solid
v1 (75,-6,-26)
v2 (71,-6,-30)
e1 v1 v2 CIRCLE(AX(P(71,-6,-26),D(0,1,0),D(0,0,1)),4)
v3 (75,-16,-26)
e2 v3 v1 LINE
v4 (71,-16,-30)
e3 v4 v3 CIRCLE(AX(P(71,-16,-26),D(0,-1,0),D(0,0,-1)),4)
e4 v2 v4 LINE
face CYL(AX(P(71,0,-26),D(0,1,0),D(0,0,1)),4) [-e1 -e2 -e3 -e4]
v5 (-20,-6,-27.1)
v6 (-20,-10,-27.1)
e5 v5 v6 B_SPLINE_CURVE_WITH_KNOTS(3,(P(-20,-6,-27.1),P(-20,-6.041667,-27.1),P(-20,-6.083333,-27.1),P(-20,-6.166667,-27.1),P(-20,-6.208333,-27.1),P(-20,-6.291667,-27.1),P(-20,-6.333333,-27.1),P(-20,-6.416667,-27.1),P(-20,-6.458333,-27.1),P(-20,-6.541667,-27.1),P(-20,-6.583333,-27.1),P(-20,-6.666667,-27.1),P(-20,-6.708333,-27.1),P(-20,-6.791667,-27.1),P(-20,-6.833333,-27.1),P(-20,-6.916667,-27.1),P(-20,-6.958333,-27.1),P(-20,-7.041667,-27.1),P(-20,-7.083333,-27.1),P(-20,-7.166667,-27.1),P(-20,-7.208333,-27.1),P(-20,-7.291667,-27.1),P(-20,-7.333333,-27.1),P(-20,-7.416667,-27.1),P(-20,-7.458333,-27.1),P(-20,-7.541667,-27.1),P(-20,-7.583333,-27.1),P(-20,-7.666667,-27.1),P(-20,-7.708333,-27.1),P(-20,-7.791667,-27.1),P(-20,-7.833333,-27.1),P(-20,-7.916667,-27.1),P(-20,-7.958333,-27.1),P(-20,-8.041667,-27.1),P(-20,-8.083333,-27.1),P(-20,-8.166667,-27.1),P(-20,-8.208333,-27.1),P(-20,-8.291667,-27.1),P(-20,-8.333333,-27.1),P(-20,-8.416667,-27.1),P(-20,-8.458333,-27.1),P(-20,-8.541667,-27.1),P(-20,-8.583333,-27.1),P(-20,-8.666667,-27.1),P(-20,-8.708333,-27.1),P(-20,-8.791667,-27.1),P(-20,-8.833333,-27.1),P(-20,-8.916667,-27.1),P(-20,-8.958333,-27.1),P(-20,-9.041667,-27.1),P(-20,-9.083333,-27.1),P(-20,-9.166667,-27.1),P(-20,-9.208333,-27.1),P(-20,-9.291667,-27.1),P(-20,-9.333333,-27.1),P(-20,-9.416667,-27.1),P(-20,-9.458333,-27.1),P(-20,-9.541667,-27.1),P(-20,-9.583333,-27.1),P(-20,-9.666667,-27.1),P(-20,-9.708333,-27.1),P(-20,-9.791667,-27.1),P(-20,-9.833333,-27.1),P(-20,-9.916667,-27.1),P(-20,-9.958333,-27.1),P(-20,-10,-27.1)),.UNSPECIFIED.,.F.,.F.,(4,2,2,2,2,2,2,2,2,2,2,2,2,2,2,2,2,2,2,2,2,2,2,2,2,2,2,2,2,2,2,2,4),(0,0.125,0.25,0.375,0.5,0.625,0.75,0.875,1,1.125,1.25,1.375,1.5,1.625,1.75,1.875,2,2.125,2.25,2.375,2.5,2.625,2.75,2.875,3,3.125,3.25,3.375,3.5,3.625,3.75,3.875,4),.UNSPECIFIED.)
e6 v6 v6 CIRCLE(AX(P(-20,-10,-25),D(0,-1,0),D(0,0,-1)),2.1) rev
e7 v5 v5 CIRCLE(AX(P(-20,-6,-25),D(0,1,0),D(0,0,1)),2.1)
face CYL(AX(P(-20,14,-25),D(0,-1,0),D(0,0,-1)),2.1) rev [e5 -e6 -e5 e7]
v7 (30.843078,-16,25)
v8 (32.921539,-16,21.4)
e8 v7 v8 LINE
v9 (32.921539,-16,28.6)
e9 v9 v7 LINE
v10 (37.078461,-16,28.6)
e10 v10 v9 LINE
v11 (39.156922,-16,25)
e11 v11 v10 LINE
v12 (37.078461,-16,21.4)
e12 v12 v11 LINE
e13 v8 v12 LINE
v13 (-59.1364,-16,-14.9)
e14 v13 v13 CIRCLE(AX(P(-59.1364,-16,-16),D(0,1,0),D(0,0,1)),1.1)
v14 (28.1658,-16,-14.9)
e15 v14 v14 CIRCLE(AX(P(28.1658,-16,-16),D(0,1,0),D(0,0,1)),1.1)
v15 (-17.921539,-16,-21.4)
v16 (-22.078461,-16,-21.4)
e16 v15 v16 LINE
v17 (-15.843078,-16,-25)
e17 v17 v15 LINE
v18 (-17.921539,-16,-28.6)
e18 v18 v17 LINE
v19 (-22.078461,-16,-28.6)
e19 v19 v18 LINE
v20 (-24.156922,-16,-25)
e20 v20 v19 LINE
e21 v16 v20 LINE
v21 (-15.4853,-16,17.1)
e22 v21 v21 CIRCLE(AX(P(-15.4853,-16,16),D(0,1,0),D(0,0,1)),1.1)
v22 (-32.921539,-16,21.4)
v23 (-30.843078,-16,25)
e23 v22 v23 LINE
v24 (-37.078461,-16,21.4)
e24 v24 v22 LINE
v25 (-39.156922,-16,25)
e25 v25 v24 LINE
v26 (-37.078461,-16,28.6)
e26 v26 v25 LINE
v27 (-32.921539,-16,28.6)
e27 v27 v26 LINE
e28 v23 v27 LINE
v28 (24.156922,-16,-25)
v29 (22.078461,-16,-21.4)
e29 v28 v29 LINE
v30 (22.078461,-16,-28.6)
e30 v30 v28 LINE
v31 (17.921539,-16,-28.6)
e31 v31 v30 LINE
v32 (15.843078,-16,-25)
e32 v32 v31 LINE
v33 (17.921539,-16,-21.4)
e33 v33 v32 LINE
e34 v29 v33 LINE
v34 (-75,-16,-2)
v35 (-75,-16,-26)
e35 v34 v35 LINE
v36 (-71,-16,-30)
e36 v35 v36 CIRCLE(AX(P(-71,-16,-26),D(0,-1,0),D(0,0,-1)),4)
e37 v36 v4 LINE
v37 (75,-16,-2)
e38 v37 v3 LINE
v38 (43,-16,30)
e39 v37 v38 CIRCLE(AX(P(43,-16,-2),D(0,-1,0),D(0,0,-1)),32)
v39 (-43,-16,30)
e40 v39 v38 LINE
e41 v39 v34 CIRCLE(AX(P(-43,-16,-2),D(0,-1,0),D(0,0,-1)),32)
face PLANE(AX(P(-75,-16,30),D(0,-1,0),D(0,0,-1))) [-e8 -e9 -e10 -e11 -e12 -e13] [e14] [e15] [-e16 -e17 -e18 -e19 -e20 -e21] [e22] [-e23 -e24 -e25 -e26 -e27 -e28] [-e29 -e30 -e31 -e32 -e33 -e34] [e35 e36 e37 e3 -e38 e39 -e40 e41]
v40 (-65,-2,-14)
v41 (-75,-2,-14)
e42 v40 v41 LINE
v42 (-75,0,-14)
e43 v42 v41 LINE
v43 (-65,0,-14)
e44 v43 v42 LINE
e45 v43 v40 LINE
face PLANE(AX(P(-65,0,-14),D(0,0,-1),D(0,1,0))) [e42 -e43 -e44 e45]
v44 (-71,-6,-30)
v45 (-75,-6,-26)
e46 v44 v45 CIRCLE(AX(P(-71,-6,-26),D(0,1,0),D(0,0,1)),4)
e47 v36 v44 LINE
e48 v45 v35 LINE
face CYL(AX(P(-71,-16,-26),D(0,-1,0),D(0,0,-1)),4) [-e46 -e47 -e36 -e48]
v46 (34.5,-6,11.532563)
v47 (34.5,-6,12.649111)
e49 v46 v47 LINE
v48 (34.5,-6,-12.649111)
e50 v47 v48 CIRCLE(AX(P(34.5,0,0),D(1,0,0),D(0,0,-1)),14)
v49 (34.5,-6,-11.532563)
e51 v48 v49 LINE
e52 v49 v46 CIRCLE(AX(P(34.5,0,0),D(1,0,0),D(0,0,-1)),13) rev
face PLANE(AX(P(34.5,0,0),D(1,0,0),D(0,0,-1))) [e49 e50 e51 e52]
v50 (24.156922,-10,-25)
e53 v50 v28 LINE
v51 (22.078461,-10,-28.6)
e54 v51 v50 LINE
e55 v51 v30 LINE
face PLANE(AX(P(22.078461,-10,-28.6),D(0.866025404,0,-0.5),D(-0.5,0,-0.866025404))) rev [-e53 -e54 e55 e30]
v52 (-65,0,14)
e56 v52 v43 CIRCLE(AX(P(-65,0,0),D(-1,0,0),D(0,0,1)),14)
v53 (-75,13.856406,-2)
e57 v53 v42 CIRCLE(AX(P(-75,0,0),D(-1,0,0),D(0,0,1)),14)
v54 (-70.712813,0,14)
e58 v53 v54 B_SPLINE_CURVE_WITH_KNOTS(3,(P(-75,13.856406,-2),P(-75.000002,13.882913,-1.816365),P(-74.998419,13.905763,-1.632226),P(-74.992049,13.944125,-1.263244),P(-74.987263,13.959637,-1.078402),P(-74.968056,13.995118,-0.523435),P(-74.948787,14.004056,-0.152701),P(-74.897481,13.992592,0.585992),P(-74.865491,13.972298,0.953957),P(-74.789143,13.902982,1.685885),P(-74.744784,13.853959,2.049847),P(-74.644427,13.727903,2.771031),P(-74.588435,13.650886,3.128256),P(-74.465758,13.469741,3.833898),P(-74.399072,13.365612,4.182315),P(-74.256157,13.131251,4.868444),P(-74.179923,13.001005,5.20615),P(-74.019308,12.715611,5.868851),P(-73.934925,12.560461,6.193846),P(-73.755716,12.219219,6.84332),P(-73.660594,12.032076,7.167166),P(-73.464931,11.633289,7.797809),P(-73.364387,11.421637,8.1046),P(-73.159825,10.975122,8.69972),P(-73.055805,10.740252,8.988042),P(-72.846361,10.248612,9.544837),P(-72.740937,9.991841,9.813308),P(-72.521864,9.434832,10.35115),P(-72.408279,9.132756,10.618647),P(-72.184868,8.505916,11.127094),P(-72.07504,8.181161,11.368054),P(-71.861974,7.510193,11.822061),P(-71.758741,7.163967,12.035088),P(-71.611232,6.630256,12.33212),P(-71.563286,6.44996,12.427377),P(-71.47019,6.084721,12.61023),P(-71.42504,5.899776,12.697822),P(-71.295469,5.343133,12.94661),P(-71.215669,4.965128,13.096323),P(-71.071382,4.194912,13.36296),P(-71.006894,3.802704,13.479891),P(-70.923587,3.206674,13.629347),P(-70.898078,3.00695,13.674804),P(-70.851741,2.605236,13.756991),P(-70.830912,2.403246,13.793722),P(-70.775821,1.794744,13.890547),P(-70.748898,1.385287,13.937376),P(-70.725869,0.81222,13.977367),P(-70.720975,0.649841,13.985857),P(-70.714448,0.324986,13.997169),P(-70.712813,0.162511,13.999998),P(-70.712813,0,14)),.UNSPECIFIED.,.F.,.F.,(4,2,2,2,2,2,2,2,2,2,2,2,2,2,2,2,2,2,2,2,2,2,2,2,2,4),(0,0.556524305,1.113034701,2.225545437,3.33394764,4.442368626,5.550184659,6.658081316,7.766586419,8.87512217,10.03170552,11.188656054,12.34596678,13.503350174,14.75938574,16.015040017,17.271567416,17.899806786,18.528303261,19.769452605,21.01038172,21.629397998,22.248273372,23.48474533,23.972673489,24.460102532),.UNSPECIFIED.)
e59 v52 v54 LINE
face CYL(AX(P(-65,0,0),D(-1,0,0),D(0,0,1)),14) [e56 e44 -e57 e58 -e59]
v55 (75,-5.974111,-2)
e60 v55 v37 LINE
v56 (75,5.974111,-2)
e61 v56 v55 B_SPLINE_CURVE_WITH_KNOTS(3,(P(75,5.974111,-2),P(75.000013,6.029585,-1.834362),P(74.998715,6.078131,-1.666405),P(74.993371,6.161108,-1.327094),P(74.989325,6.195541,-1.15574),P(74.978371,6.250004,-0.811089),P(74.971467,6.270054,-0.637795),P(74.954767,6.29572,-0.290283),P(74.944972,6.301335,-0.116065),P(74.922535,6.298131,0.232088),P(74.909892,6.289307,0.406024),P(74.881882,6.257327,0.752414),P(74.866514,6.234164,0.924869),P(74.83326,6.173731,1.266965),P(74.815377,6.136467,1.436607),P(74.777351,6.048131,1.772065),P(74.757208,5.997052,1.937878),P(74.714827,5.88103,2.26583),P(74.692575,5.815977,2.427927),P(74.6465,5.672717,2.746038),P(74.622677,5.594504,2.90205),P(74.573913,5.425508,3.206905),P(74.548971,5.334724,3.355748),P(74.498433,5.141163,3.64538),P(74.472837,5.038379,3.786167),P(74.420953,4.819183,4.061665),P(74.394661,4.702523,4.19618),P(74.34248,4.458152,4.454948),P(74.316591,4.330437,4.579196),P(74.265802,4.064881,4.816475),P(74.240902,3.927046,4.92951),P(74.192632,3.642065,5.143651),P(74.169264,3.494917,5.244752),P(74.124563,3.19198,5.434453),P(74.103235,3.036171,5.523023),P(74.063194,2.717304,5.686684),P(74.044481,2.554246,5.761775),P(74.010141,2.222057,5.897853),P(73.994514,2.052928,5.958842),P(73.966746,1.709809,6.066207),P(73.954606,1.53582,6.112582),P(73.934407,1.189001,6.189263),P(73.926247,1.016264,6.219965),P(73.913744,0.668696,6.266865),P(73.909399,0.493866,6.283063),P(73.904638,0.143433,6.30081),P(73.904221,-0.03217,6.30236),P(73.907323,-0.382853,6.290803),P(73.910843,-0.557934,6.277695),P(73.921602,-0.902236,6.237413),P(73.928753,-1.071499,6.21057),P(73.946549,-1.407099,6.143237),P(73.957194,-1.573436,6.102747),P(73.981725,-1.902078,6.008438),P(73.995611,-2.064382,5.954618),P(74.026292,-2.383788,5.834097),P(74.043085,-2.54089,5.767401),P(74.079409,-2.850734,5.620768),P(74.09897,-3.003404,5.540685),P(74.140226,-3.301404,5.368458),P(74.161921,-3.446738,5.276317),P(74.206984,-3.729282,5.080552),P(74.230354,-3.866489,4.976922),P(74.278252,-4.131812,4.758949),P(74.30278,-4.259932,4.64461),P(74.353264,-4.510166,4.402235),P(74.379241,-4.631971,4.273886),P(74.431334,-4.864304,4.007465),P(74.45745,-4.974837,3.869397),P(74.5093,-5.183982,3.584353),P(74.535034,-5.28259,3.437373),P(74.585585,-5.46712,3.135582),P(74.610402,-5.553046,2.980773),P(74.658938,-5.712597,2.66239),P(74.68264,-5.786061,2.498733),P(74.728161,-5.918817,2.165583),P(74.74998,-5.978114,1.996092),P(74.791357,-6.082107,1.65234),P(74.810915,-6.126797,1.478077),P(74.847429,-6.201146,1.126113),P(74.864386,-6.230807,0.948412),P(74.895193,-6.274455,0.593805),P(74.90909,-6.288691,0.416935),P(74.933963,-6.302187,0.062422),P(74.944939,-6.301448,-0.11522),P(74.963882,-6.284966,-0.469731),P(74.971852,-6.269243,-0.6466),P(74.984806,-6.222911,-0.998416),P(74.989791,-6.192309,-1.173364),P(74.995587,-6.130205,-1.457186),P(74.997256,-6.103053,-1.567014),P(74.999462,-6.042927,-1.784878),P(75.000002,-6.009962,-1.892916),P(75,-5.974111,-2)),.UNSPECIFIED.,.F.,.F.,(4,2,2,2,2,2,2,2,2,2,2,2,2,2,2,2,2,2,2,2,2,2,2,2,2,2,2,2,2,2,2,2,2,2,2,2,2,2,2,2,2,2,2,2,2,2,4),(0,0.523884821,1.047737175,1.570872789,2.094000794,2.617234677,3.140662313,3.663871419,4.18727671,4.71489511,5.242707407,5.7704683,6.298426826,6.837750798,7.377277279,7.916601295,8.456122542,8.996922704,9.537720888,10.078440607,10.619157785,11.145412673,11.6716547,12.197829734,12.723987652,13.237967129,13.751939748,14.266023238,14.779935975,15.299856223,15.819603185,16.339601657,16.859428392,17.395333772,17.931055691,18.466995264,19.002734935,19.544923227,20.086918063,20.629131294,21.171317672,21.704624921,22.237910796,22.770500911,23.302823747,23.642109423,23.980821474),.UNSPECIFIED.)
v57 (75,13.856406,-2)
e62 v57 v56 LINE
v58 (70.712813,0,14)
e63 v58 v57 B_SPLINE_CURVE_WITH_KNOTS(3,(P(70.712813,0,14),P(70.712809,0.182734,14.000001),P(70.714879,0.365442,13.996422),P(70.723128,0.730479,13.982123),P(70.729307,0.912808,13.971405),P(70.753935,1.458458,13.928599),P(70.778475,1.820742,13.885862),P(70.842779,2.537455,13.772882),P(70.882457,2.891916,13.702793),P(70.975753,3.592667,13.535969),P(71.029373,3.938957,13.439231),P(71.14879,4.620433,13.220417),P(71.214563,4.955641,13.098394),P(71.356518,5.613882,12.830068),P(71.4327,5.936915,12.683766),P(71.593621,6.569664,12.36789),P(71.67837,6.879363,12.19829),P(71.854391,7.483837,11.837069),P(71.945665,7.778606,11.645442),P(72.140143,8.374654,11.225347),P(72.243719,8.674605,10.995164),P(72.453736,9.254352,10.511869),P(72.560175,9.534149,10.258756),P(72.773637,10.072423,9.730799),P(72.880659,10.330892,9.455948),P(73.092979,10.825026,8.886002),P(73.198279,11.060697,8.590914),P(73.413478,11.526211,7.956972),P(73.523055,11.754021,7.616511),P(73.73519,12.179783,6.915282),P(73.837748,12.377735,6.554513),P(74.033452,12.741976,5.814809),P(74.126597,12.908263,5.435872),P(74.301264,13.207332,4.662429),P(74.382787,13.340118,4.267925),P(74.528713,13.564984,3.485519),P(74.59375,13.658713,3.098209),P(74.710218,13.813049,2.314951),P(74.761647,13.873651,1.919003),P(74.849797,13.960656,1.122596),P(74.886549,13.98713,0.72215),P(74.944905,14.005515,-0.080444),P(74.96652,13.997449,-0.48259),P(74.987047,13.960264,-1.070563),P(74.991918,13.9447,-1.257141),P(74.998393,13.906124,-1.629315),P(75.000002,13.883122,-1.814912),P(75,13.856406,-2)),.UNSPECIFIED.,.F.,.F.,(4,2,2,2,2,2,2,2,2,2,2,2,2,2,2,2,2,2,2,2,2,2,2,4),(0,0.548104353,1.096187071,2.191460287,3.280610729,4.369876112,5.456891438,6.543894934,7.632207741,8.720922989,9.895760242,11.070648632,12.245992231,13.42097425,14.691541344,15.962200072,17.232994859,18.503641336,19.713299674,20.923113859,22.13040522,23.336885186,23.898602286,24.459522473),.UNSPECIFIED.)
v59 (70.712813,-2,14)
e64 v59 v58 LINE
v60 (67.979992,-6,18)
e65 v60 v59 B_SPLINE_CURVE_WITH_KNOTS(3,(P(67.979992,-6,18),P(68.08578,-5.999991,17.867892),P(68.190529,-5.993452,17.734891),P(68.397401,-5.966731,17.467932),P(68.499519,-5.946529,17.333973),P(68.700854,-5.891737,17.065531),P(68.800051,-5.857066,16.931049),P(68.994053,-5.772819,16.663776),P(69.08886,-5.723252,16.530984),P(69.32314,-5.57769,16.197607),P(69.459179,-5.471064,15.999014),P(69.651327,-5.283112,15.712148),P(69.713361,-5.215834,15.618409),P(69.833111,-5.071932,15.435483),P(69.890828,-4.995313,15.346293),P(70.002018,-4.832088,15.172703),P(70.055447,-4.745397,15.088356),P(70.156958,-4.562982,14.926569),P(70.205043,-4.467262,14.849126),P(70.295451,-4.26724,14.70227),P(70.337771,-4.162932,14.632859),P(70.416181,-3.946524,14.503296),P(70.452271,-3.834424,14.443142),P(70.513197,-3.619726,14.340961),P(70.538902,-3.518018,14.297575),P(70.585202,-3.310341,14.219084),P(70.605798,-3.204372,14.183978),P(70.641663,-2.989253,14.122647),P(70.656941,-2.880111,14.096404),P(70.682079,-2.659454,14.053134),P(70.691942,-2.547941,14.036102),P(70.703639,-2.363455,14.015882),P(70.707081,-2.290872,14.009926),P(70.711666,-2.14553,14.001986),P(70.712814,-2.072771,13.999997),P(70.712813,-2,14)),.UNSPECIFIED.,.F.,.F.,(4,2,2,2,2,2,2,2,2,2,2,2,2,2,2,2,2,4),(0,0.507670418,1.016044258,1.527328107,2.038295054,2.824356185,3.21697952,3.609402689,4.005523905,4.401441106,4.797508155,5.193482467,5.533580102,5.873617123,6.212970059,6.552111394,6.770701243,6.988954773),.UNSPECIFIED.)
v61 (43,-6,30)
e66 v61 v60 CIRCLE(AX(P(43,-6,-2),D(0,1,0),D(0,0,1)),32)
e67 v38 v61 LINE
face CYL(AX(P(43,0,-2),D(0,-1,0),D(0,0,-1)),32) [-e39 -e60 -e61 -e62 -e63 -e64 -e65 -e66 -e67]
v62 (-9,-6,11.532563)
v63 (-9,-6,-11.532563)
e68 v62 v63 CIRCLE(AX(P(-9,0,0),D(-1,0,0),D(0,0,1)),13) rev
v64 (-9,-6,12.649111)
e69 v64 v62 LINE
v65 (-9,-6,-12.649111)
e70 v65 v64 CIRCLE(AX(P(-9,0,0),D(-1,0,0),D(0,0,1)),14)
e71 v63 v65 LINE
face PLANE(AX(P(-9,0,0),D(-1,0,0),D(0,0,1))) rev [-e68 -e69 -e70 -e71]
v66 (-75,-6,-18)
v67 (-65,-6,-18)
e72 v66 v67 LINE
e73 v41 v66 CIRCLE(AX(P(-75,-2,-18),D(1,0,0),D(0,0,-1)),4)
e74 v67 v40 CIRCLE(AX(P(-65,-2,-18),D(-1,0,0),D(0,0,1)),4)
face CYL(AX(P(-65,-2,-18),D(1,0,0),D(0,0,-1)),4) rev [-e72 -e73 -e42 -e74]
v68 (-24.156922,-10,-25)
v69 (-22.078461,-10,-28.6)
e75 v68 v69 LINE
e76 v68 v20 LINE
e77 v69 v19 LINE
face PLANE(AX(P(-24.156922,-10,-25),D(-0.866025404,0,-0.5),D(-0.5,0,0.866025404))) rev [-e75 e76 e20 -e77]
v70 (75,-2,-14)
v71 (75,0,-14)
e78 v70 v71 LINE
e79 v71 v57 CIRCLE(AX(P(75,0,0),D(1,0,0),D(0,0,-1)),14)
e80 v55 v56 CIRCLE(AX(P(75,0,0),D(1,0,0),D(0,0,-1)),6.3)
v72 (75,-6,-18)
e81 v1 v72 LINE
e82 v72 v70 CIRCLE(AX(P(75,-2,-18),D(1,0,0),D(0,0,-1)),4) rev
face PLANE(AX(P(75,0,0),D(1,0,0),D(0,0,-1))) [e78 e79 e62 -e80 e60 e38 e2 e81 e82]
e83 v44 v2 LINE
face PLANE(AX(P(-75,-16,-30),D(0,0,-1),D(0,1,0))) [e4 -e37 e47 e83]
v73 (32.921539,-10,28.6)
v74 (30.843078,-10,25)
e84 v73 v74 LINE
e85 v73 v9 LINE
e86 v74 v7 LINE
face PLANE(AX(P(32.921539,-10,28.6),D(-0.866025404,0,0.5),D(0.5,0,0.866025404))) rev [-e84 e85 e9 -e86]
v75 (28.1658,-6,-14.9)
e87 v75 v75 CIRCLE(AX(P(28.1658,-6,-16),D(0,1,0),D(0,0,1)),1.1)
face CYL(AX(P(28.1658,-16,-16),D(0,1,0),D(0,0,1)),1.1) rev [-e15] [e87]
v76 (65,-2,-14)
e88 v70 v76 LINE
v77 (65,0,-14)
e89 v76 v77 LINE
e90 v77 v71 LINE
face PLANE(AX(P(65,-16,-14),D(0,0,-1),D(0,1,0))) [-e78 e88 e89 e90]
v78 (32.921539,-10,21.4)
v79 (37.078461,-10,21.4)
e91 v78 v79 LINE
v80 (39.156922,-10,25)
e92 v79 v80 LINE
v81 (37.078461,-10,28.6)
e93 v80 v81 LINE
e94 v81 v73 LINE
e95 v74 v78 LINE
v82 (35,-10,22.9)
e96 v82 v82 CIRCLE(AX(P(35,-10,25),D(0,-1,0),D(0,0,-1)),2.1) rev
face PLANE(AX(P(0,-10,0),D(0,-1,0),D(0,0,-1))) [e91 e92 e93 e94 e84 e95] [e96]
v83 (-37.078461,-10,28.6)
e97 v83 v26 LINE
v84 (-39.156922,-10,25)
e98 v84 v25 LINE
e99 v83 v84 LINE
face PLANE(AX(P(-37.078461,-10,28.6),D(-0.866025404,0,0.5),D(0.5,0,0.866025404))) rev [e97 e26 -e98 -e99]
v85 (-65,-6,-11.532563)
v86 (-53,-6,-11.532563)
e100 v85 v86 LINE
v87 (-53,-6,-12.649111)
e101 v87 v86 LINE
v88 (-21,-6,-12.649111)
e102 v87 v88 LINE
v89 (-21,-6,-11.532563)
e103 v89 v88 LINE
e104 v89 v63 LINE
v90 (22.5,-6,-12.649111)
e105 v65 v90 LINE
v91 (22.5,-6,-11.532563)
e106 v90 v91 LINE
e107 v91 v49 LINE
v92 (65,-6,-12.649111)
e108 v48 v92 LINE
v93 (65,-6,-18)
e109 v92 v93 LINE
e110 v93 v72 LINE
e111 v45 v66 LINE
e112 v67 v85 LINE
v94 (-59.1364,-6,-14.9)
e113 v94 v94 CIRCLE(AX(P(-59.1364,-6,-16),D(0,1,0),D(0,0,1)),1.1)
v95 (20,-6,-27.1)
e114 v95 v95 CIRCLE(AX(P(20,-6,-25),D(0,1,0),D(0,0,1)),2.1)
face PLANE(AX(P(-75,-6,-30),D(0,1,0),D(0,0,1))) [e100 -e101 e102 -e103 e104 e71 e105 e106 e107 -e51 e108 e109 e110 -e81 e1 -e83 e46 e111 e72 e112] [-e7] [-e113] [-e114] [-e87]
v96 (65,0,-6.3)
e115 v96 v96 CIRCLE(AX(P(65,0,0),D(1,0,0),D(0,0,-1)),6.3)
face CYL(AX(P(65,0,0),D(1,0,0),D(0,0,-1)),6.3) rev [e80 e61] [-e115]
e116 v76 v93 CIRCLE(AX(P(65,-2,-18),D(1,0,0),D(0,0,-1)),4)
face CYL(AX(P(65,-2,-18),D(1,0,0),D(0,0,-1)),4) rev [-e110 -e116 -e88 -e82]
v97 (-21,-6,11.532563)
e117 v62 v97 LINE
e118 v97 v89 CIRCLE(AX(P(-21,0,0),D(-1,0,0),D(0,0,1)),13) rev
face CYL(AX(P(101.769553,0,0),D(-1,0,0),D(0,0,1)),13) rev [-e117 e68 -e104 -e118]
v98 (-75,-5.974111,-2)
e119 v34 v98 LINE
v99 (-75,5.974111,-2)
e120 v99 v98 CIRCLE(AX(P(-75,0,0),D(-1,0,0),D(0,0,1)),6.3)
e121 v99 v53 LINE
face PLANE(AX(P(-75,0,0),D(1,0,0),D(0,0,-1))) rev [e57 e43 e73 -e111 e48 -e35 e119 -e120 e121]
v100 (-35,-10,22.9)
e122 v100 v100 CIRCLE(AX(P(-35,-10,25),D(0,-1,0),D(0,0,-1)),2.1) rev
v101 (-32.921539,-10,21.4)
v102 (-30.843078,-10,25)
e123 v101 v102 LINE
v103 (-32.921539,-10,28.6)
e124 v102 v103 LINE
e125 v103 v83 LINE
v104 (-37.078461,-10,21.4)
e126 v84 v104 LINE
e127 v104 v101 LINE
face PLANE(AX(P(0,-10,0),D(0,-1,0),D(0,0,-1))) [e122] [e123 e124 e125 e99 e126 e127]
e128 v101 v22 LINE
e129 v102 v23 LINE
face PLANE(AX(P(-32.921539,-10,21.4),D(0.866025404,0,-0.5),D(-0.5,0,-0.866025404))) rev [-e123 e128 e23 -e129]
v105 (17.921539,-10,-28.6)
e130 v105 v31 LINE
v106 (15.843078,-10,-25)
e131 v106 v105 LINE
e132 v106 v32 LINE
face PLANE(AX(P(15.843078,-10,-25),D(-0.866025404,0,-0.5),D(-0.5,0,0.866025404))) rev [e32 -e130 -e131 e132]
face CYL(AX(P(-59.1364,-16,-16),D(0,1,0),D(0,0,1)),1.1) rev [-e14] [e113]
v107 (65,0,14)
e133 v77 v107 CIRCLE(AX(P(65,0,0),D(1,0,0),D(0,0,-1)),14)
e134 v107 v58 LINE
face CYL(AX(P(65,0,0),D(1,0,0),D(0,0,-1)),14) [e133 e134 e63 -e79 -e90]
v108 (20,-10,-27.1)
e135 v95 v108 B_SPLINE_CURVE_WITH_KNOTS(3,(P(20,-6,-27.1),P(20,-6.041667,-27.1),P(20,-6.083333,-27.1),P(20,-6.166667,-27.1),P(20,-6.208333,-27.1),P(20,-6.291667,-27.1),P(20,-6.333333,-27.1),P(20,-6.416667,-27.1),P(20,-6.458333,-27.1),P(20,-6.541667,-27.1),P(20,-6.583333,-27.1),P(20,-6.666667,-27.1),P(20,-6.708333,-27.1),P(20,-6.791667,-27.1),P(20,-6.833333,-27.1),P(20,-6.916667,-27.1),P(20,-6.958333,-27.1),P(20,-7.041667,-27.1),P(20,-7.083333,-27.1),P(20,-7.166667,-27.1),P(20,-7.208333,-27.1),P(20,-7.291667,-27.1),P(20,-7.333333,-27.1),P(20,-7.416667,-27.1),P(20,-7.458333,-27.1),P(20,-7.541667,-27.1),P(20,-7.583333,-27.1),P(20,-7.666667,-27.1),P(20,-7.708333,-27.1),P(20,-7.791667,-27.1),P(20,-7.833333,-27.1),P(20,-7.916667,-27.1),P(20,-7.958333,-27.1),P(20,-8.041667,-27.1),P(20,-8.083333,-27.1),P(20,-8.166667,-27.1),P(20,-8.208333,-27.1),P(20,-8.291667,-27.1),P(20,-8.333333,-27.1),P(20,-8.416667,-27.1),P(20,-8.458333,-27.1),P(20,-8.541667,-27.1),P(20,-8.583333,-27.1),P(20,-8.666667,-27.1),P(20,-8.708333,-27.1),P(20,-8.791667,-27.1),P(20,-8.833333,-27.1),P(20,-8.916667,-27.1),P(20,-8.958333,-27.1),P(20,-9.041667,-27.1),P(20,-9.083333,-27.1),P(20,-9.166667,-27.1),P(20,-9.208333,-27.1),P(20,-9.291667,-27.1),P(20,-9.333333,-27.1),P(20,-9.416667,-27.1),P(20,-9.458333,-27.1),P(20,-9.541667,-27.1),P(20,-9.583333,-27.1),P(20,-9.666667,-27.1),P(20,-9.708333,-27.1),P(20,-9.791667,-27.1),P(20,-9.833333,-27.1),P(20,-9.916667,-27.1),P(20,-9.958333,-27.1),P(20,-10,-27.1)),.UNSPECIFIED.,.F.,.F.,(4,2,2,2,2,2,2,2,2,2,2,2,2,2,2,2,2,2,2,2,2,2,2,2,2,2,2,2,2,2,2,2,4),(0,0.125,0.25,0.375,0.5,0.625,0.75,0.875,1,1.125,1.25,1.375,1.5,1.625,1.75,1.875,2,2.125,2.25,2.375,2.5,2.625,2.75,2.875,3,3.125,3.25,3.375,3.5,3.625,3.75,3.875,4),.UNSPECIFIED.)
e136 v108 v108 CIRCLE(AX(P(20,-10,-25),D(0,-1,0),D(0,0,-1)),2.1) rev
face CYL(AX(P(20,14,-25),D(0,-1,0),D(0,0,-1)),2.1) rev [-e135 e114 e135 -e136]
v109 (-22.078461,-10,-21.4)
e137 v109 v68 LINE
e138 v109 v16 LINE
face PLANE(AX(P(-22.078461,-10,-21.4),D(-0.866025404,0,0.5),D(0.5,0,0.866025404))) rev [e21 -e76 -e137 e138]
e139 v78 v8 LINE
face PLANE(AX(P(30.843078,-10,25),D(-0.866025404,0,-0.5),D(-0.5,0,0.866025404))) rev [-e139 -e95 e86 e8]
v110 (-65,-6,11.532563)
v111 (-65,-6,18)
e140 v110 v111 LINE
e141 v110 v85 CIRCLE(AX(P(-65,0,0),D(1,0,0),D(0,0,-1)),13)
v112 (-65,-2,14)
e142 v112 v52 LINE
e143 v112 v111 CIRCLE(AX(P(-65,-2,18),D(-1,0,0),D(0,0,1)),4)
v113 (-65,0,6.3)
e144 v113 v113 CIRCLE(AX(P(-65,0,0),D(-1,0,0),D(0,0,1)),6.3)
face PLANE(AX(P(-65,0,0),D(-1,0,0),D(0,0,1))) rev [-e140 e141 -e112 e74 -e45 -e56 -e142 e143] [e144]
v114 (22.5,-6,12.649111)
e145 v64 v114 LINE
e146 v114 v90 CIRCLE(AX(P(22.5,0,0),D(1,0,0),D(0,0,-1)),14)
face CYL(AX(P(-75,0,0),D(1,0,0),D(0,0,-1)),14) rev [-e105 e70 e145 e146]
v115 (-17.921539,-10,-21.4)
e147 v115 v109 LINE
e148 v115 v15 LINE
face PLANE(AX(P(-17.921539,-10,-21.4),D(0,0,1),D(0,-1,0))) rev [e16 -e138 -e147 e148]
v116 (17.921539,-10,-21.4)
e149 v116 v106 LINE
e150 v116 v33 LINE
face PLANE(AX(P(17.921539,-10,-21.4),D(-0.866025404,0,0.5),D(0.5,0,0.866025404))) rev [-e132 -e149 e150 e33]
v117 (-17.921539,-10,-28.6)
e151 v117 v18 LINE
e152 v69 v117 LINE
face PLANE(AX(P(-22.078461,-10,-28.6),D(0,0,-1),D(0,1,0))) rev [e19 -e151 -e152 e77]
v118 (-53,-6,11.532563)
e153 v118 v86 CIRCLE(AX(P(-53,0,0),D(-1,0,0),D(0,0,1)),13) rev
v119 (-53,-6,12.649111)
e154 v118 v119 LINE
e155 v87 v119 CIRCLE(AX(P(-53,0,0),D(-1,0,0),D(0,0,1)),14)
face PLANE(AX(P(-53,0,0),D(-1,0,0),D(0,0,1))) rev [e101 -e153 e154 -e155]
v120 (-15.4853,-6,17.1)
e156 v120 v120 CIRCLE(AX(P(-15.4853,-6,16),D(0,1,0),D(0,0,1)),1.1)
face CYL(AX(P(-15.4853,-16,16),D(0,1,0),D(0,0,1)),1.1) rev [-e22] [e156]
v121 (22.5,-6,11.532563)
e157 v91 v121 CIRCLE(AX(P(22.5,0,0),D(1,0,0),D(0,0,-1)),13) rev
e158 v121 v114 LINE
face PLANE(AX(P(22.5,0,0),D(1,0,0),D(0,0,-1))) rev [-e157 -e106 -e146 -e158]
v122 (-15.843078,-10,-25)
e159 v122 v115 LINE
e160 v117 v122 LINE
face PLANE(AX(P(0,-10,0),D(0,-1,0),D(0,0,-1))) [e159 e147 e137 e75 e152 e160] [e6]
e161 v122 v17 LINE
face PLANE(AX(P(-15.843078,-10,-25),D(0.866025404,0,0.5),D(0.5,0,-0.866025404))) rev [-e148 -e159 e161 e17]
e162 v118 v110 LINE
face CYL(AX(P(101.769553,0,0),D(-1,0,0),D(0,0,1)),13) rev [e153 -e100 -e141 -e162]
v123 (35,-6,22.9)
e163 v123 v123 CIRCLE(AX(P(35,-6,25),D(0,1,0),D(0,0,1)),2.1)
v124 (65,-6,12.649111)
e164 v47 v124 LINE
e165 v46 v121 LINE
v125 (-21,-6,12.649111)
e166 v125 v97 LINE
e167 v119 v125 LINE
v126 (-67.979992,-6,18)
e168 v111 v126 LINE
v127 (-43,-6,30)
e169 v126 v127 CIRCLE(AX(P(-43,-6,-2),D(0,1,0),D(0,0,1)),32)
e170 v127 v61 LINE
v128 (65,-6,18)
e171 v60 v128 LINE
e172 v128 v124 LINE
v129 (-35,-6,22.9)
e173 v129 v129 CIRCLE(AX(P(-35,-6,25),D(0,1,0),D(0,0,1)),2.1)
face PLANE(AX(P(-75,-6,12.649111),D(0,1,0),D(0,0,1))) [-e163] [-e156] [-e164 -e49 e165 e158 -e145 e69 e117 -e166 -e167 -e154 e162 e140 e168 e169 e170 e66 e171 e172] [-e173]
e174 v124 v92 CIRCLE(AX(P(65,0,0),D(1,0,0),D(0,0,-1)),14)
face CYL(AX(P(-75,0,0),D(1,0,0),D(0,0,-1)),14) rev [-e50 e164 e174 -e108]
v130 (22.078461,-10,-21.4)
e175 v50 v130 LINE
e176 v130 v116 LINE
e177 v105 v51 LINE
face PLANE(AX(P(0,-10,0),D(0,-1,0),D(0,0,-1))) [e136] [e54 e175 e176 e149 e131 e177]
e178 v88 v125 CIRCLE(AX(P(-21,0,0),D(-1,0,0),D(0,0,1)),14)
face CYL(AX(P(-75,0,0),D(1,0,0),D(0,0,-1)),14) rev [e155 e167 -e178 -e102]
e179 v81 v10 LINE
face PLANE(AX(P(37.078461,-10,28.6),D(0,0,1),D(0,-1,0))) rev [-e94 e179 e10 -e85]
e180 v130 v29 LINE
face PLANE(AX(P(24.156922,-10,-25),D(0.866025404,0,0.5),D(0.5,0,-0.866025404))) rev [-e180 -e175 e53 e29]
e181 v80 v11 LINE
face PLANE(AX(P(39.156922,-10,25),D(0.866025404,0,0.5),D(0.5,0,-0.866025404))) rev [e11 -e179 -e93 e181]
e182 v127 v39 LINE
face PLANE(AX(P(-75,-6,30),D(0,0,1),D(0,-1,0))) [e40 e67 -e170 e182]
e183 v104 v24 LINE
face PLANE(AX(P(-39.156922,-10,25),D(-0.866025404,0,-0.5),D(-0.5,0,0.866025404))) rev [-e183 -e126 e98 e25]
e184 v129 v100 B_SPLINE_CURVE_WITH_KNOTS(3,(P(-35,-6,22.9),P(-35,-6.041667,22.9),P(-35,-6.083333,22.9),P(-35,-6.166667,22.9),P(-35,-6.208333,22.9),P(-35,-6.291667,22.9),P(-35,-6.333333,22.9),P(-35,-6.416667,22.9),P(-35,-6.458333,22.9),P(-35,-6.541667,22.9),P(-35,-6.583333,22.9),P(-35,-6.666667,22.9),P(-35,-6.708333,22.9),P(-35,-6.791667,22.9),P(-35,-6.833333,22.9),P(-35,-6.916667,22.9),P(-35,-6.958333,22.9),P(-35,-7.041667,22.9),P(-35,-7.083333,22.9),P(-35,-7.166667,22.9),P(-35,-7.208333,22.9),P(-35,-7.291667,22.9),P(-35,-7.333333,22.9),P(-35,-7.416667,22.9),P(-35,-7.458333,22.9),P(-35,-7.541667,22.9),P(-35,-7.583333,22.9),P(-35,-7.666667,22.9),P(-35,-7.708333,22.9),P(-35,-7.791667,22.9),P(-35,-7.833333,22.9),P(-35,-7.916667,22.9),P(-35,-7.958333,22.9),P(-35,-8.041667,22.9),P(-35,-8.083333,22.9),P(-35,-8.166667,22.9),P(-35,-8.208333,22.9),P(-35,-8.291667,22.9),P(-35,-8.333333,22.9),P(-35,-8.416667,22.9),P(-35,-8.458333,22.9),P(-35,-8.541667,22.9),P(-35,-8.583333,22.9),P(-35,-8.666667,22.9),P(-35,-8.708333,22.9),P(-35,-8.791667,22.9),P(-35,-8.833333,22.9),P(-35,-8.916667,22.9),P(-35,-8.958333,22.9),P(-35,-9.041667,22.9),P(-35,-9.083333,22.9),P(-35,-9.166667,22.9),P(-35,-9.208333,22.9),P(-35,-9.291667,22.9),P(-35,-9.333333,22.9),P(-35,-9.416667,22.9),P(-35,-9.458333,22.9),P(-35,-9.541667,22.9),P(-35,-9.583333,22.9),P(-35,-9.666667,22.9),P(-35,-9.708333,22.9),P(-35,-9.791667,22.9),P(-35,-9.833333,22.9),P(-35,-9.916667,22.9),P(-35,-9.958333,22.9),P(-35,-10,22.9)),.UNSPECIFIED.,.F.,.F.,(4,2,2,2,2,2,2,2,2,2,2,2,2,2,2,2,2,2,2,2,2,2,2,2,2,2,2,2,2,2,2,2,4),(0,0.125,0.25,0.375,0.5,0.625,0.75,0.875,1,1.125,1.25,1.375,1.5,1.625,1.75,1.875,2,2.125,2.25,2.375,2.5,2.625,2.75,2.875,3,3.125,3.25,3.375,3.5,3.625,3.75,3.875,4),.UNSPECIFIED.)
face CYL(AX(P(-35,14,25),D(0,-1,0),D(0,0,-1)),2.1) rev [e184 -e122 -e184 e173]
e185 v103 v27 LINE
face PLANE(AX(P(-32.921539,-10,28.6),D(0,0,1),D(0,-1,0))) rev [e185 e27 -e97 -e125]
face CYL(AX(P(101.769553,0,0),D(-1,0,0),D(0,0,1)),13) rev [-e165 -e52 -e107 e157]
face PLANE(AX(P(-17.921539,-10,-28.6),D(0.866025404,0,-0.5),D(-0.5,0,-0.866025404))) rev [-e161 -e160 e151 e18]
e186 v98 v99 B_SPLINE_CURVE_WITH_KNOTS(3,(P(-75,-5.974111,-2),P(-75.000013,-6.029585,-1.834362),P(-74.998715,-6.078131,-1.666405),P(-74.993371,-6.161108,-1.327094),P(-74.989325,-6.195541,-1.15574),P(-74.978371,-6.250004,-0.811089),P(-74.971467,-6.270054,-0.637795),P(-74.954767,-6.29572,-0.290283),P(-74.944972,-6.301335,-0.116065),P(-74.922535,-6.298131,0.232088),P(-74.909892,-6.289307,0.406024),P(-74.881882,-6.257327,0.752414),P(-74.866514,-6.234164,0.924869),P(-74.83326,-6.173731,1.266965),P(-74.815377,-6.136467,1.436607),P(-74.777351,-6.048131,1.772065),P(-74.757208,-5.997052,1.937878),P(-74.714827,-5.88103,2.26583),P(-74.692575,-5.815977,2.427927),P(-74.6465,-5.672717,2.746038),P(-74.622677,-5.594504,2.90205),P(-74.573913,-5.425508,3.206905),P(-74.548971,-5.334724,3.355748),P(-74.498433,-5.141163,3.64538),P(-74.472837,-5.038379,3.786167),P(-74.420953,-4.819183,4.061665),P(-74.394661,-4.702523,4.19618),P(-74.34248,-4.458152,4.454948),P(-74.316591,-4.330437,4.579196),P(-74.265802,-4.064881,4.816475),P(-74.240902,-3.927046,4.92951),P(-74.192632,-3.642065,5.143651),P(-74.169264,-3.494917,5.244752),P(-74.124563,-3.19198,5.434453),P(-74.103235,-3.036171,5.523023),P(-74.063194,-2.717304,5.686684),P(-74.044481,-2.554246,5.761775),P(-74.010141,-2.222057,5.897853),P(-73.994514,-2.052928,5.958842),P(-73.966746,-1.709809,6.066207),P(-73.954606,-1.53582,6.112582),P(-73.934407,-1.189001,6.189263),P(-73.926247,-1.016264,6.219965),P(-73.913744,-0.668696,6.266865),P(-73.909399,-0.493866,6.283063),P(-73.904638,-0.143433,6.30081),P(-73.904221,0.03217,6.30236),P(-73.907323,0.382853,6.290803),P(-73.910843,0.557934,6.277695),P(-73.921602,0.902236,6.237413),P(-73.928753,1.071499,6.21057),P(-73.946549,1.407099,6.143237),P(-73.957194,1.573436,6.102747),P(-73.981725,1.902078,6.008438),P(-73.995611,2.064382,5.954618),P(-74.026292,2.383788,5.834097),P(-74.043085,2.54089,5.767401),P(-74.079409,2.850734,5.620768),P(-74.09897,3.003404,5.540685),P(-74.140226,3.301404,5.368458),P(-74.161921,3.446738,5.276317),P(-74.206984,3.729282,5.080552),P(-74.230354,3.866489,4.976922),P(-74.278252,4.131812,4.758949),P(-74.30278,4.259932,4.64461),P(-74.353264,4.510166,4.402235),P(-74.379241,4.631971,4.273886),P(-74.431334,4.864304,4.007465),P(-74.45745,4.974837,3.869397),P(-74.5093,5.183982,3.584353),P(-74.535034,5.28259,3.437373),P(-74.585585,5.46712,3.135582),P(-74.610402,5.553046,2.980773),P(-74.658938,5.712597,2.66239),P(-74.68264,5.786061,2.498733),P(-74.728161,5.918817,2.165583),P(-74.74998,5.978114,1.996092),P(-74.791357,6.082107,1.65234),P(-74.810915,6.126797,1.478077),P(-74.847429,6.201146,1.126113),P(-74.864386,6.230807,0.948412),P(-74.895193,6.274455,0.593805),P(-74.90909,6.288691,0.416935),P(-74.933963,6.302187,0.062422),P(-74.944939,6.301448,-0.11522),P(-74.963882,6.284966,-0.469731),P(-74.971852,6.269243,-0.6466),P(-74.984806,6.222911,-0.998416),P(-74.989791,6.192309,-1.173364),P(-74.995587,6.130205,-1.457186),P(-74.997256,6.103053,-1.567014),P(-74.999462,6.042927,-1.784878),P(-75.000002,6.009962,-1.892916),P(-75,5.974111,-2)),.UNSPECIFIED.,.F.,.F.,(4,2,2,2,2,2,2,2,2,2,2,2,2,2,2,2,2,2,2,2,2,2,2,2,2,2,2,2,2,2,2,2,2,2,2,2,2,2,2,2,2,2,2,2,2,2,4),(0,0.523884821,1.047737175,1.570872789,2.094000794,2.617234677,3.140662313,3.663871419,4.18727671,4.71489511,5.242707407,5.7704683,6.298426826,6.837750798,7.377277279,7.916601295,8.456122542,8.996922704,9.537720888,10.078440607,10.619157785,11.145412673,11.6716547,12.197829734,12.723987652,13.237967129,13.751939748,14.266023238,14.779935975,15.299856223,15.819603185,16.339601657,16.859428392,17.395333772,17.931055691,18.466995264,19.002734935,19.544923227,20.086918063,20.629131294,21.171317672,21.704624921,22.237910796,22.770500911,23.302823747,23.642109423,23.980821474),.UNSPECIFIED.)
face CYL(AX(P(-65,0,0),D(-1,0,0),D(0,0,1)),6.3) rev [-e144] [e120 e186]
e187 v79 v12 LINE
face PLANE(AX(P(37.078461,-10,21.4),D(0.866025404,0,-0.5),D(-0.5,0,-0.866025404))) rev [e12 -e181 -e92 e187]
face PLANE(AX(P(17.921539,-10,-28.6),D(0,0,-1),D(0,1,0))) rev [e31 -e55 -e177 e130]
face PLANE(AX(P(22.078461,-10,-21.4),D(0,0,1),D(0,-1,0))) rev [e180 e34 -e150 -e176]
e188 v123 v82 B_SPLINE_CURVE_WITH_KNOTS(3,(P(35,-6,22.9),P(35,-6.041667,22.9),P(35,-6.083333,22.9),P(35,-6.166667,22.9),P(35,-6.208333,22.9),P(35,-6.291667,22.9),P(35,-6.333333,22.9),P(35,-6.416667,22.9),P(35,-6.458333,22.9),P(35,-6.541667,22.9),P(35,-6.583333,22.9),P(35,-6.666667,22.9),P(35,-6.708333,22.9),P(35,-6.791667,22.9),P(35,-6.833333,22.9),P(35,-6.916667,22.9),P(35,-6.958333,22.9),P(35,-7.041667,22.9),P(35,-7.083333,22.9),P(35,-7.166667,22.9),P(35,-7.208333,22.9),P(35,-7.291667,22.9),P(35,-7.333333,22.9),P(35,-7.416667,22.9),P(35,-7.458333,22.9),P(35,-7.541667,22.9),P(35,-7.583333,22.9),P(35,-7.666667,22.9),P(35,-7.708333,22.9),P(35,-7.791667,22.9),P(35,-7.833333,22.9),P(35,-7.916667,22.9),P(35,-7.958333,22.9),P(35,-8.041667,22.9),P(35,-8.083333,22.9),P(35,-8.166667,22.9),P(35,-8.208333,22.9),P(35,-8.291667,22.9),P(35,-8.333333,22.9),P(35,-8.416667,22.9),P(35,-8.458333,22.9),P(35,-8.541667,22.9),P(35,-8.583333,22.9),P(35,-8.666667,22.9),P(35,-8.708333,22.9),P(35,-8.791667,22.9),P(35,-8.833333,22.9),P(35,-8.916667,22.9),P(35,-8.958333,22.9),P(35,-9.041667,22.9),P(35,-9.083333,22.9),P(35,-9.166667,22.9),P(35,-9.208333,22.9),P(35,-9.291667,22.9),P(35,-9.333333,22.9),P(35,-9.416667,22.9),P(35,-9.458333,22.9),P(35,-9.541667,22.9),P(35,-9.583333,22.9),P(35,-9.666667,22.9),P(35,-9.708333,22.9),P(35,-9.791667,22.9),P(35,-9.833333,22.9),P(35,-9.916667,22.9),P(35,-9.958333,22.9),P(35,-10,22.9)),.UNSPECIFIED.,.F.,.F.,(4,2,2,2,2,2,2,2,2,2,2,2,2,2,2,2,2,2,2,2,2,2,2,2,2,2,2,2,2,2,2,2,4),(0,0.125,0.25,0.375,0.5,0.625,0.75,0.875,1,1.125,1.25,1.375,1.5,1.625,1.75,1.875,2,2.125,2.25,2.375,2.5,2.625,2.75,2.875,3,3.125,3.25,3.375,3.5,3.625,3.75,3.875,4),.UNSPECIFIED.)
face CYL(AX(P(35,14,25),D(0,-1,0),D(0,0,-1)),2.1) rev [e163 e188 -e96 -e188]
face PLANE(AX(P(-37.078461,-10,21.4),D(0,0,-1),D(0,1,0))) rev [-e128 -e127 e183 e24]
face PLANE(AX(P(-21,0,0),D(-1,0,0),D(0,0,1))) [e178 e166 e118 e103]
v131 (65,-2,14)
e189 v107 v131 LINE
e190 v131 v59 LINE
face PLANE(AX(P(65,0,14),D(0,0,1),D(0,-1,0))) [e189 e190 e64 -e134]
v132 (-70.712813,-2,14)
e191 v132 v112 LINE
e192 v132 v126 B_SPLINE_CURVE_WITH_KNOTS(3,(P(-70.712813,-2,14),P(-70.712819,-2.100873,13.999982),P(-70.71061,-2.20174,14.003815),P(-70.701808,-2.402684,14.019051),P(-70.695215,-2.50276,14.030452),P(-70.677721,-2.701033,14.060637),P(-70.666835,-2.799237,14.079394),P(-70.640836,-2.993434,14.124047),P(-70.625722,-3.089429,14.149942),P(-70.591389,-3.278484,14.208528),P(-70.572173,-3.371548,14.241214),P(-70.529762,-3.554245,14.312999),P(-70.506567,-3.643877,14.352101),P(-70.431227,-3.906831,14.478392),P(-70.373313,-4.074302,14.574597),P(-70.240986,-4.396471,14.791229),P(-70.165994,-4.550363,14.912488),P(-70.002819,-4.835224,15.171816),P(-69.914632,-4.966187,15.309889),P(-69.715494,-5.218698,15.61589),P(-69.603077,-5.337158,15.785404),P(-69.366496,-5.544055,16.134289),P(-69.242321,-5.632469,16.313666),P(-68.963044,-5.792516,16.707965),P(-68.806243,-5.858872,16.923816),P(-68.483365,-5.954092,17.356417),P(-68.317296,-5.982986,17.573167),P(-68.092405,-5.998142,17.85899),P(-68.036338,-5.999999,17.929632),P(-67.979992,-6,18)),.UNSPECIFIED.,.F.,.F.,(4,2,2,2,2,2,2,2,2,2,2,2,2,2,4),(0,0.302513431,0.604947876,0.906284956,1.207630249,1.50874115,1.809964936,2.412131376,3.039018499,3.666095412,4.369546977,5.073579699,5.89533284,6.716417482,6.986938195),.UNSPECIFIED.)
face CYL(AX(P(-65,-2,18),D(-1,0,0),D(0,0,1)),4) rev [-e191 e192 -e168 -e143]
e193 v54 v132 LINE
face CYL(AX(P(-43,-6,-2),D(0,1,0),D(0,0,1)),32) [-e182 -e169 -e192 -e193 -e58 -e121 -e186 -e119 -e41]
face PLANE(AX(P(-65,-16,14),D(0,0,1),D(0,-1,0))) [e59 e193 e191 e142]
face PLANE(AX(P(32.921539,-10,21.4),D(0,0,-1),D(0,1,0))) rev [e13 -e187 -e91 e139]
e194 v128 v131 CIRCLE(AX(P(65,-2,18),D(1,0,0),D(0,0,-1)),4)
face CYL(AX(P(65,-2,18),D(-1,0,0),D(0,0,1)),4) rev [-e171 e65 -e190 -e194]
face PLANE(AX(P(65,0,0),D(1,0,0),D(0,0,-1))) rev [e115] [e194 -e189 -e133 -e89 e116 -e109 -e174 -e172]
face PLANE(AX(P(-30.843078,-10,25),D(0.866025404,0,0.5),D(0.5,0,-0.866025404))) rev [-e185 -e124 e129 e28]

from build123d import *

# Parameters (mm, degrees)
BOSS_EXTRUDE1_DEPTH      = 75
BOSS_EXTRUDE1_DEPTH_BACK = 75
BOSS_EXTRUDE2_START      = -10
SKETCH2_R                = 6.3
BOSS_EXTRUDE2_DEPTH      = 10
SKETCH3_R                = 6.3
BOSS_EXTRUDE3_DEPTH      = 10
SKETCH4_R                = 1.1
CUT_EXTRUDE1_DEPTH       = 84.216584885
SKETCH5_R                = 2.1
CUT_EXTRUDE2_DEPTH       = 87.168439698
CUT_EXTRUDE3_DEPTH       = 6
FILLET1_R                = 4
FILLET2_R                = 4
FILLET3_R                = 32
BOSS_EXTRUDE4_DEPTH      = 12
BOSS_EXTRUDE5_START      = -43.5
BOSS_EXTRUDE5_DEPTH      = 12
BOSS_EXTRUDE7_START      = 44
BOSS_EXTRUDE7_DEPTH      = 12
SKETCH16_R               = 13
CUT_EXTRUDE8_DEPTH       = 99.5


with BuildPart() as part:
    # Sketch1 → Boss-Extrude1 (new, two sides: drawn at the far end of the back side and taken through both)
    with BuildSketch(Plane(origin=(0, 0, 0), x_dir=(0, 0, -1), z_dir=(1, 0, 0)).offset(-BOSS_EXTRUDE1_DEPTH_BACK)):
        with BuildLine():
            Line((-12.649110641, -6), (-30, -6))
            Line((-30, -6), (-30, -16))
            Line((-30, -16), (30, -16))
            Line((30, -16), (30, -6))
            Line((30, -6), (12.649110641, -6))
            ThreePointArc((12.649110641, -6), (0, -14), (-12.649110641, -6))
        make_face()
    extrude(amount=BOSS_EXTRUDE1_DEPTH + BOSS_EXTRUDE1_DEPTH_BACK)

    # Sketch2 → Boss-Extrude2 (add)
    with BuildSketch(Plane(origin=(75, 0, 0), x_dir=(0, 0, -1), z_dir=(1, 0, 0)).offset(BOSS_EXTRUDE2_START)):
        with BuildLine():
            Line((-14, 0), (-14, -16))
            Line((-14, -16), (14, -16))
            Line((14, -16), (14, 0))
            ThreePointArc((14, 0), (0, 14), (-14, 0))
        make_face()
        Circle(SKETCH2_R, mode=Mode.SUBTRACT)
    extrude(amount=BOSS_EXTRUDE2_DEPTH)

    # Sketch3 → Boss-Extrude3 (add)
    with BuildSketch(Plane.ZY.offset(75)):
        with BuildLine():
            Line((-14, 0), (-14, -16))
            Line((-14, -16), (14, -16))
            Line((14, -16), (14, 0))
            ThreePointArc((14, 0), (0, 14), (-14, 0))
        make_face()
        with Locations(Location((0, 0, 0), (0, 0, 180))):
            Circle(SKETCH3_R, mode=Mode.SUBTRACT)
    extrude(amount=-BOSS_EXTRUDE3_DEPTH)

    # Sketch4 → Cut-Extrude1 (cut, through all)
    with BuildSketch(Plane(origin=(0, -6, 0), x_dir=(1, 0, 0), z_dir=(0, 1, 0))):
        with Locations(Location((-15.4853, -16, 0), (0, 0, 270))):
            Circle(SKETCH4_R)
        with Locations(Location((-59.1364, 16, 0), (0, 0, 270))):
            Circle(SKETCH4_R)
        with Locations(Location((28.1658, 16, 0), (0, 0, 270))):
            Circle(SKETCH4_R)
    extrude(amount=-CUT_EXTRUDE1_DEPTH, mode=Mode.SUBTRACT)

    # Sketch5 → Cut-Extrude2 (cut, through all)
    with BuildSketch(Plane.XZ.offset(16)):
        with Locations(Location((-35, 25, 0), (0, 0, 270))):
            Circle(SKETCH5_R)
        with Locations(Location((35, 25, 0), (0, 0, 270))):
            Circle(SKETCH5_R)
        with Locations(Location((-20, -25, 0), (0, 0, 270))):
            Circle(SKETCH5_R)
        with Locations(Location((20, -25, 0), (0, 0, 270))):
            Circle(SKETCH5_R)
    extrude(amount=-CUT_EXTRUDE2_DEPTH, mode=Mode.SUBTRACT)

    # Sketch7 → Cut-Extrude3 (cut)
    with BuildSketch(Plane.XZ.offset(16)):
        Polygon((-37.078460969, 28.6), (-39.156921938, 25), (-37.078460969, 21.4), (-32.921539031, 21.4), (-30.843078062, 25), (-32.921539031, 28.6), align=None)
        Polygon((32.921539031, 28.6), (30.843078062, 25), (32.921539031, 21.4), (37.078460969, 21.4), (39.156921938, 25), (37.078460969, 28.6), align=None)
        Polygon((-22.078460969, -21.4), (-24.156921938, -25), (-22.078460969, -28.6), (-17.921539031, -28.6), (-15.843078062, -25), (-17.921539031, -21.4), align=None)
        Polygon((17.921539031, -21.4), (15.843078062, -25), (17.921539031, -28.6), (22.078460969, -28.6), (24.156921938, -25), (22.078460969, -21.4), align=None)
    extrude(amount=-CUT_EXTRUDE3_DEPTH, mode=Mode.SUBTRACT)

    # Fillet1
    fillet1_edges = [part.edges().sort_by_distance(p)[0] for p in [
        (70, -6, -14),
        (70, -6, 14),
        (-70, -6, 14),
        (-70, -6, -14),
    ]]
    fillet(fillet1_edges, radius=FILLET1_R)

    # Fillet2
    fillet2_edges = [part.edges().sort_by_distance(p)[0] for p in [
        (-75, -11, -30),
        (75, -11, -30),
    ]]
    fillet(fillet2_edges, radius=FILLET2_R)

    # Fillet3
    # the kernel refuses this fillet: 32 mm, written as the material it takes off along each edge
    with BuildSketch(Plane(origin=(75, 74, 30), x_dir=(0, 0, -1), z_dir=(0, -1, 0)), Plane(origin=(-75, 74, 30), x_dir=(1, 0, 0), z_dir=(0, -1, 0))) as fillet3_piece_1:
        with BuildLine():
            CenterArc((FILLET3_R, -FILLET3_R), FILLET3_R, 90, 90)
            Line((0, -FILLET3_R), (0, 0))
            Line((0, 0), (FILLET3_R, 0))
        make_face()
    extrude(amount=170, mode=Mode.SUBTRACT)

    # Sketch8 → Boss-Extrude4 (add)
    with BuildSketch(Plane.ZY.offset(21)):
        with BuildLine():
            Line((-10.9658561, -6), (-13.747727085, -6))
            ThreePointArc((-13.747727085, -6), (0, -15), (13.747727085, -6))
            Line((13.747727085, -6), (10.9658561, -6))
            ThreePointArc((10.9658561, -6), (0, -12.5), (-10.9658561, -6))
        make_face()
    extrude(amount=-BOSS_EXTRUDE4_DEPTH)

    # Sketch8<2> → Boss-Extrude5 (add)
    with BuildSketch(Plane.ZY.offset(21).offset(BOSS_EXTRUDE5_START)):
        with BuildLine():
            Line((-10.9658561, -6), (-13.747727085, -6))
            ThreePointArc((-13.747727085, -6), (0, -15), (13.747727085, -6))
            Line((13.747727085, -6), (10.9658561, -6))
            ThreePointArc((10.9658561, -6), (0, -12.5), (-10.9658561, -6))
        make_face()
    extrude(amount=-BOSS_EXTRUDE5_DEPTH)

    # Sketch8<4> → Boss-Extrude7 (add)
    with BuildSketch(Plane.ZY.offset(21).offset(BOSS_EXTRUDE7_START)):
        with BuildLine():
            Line((-10.9658561, -6), (-13.747727085, -6))
            ThreePointArc((-13.747727085, -6), (0, -15), (13.747727085, -6))
            Line((13.747727085, -6), (10.9658561, -6))
            ThreePointArc((10.9658561, -6), (0, -12.5), (-10.9658561, -6))
        make_face()
    extrude(amount=-BOSS_EXTRUDE7_DEPTH)

    # Sketch16 → Cut-Extrude8 (cut)
    with BuildSketch(Plane(origin=(-65, 0, 0), x_dir=(0, 0, -1), z_dir=(1, 0, 0))):
        Circle(SKETCH16_R)
    extrude(amount=CUT_EXTRUDE8_DEPTH, mode=Mode.SUBTRACT)


solid = part.part
